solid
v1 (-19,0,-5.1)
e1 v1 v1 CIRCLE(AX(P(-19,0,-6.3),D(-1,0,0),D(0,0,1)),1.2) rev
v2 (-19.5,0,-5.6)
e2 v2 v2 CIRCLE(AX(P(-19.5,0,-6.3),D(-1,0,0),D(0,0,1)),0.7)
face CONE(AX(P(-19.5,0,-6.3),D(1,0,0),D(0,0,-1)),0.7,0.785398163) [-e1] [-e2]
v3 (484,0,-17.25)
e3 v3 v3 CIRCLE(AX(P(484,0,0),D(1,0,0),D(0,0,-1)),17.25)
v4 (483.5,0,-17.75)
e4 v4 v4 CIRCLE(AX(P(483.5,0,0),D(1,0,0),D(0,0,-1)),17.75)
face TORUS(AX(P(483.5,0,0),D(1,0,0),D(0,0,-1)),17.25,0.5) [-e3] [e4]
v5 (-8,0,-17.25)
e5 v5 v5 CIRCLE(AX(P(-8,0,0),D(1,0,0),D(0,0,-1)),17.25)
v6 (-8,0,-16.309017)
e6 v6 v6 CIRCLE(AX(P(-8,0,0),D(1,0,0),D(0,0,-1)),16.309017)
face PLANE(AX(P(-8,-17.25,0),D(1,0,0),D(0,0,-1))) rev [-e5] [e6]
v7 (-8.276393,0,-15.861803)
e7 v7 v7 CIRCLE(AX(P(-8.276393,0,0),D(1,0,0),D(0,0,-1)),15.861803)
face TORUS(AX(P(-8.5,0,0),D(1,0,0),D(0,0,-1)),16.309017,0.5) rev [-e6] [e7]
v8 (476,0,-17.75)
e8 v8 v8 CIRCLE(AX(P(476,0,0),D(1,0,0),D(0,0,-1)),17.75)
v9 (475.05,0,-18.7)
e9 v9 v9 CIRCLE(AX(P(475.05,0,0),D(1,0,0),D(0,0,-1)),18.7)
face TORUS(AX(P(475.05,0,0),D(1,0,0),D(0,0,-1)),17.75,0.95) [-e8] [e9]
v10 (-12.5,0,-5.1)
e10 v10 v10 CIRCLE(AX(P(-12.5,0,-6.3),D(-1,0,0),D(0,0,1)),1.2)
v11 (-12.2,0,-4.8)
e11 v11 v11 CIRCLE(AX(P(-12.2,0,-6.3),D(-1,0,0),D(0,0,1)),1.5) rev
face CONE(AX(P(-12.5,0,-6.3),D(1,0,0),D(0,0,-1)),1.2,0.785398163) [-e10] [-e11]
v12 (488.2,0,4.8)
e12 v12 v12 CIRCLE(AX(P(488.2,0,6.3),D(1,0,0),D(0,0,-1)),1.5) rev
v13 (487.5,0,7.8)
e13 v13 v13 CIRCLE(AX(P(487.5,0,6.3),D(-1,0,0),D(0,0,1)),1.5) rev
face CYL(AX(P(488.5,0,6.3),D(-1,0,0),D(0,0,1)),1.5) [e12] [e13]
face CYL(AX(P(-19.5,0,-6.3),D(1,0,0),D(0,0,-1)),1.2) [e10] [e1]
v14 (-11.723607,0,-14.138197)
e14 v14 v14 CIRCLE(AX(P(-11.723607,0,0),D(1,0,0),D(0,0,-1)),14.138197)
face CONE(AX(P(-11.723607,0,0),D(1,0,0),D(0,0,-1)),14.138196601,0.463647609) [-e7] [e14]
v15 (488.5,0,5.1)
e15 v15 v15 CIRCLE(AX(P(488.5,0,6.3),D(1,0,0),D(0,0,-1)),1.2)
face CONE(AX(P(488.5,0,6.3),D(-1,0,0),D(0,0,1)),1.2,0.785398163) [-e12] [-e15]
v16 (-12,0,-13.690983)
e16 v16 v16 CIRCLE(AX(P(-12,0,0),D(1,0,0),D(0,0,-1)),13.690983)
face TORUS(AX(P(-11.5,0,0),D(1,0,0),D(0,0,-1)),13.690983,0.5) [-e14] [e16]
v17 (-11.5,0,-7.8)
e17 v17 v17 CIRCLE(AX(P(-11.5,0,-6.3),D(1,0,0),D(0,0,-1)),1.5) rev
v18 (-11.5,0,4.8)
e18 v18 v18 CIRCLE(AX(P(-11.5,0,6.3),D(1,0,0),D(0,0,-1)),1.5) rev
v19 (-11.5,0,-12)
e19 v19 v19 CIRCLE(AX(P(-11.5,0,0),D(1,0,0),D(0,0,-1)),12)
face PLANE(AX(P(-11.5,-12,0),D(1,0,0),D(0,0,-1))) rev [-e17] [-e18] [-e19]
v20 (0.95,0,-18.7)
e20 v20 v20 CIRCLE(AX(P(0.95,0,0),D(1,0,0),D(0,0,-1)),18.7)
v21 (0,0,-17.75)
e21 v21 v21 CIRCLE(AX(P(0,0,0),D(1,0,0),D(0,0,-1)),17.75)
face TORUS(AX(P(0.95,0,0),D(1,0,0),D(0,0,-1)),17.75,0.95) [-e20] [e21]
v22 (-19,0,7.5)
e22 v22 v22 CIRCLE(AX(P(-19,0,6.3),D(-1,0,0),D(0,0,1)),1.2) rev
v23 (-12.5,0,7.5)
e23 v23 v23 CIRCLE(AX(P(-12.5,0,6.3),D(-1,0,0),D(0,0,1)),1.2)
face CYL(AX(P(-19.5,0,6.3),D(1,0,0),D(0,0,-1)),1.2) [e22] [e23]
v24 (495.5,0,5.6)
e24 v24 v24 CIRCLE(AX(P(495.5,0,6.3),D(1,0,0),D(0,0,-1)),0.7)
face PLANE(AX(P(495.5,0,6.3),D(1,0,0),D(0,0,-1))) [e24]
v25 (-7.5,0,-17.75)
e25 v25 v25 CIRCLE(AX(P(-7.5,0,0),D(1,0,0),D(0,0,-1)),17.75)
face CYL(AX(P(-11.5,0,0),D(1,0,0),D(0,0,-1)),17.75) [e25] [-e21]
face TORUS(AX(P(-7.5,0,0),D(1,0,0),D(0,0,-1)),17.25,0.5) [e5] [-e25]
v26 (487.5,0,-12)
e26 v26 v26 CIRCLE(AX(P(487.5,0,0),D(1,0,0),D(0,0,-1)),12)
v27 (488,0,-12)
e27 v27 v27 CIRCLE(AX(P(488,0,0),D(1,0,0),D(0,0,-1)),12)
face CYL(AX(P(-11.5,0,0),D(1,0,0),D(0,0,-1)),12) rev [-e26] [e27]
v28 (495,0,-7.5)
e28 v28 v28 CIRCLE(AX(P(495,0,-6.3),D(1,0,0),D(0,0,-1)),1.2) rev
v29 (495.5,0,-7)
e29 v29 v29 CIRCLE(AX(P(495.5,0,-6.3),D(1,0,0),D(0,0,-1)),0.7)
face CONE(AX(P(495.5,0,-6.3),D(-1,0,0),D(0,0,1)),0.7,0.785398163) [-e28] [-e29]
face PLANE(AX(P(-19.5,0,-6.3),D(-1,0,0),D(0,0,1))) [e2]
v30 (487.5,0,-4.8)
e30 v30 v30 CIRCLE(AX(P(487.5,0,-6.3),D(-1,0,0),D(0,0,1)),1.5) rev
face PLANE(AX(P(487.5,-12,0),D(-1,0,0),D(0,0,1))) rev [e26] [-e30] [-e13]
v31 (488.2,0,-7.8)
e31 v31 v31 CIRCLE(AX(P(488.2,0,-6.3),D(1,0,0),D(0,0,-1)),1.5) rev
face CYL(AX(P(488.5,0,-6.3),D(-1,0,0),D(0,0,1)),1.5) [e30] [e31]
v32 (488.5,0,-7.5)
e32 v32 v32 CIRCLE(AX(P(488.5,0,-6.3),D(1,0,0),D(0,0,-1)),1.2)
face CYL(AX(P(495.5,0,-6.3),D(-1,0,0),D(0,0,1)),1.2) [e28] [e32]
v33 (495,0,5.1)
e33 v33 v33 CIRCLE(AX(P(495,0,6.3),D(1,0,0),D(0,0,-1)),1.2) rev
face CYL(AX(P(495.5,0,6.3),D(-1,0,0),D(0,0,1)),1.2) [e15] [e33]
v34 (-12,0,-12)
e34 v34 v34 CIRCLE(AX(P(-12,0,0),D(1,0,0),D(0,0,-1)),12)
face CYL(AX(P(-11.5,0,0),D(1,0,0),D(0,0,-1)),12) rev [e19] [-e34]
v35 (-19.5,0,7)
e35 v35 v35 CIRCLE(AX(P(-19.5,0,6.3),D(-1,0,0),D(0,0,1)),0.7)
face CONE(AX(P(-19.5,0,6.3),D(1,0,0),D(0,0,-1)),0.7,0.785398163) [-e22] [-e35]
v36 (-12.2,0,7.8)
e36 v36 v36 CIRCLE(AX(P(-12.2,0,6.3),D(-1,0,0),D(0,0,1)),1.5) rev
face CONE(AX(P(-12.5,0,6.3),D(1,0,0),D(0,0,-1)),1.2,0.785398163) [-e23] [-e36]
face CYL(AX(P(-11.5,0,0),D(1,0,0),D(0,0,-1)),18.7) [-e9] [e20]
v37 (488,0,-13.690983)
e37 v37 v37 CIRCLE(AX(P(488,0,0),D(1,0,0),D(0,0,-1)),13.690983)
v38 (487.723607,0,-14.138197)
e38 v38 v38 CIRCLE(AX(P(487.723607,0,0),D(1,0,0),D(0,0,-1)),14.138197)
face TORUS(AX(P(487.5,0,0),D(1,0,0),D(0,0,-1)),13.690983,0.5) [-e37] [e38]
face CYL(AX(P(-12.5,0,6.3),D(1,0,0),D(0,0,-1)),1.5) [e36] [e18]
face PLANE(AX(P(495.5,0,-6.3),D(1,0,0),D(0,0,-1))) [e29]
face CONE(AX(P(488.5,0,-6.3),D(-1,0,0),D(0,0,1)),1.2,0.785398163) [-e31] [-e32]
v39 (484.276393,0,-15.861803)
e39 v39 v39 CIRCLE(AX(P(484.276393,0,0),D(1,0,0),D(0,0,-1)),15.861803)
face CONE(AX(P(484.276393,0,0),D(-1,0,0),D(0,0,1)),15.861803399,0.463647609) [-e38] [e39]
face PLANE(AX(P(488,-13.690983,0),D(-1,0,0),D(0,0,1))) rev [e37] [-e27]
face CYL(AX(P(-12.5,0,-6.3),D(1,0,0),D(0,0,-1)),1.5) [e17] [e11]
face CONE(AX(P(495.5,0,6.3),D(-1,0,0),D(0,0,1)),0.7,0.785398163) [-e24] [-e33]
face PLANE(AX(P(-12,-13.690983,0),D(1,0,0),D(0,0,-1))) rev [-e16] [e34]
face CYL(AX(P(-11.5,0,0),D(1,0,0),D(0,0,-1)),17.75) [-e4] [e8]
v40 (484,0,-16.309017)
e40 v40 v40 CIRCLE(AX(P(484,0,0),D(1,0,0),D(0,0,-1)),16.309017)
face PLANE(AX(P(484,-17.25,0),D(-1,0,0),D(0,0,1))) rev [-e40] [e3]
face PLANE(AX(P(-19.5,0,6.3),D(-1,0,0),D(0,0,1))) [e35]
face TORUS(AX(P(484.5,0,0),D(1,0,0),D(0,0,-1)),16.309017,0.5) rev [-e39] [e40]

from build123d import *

# Parameters (mm, degrees)
SKETCH2_R      = 1.2
EXTRUDE1_DEPTH = 8
SKETCH3_R      = 1.5
EXTRUDE2_DEPTH = 1
EXTRUDE3_START = 8
SKETCH4_R      = 1.2
EXTRUDE3_DEPTH = 8
EXTRUDE4_START = 1
SKETCH5_R      = 1.5
EXTRUDE4_DEPTH = 1
CHAMFER1_SIZE  = 0.3
CHAMFER2_SIZE  = 0.5


with BuildPart() as part:
    # Sketch1 → Revolve1 (revolve)
    with BuildSketch(Plane.XY, mode=Mode.PRIVATE) as revolve1_sk:
        with BuildLine():
            Line((0, -17.75), (-7.5, -17.75))
            ThreePointArc((-7.5, -17.75), (-7.853553391, -17.603553391), (-8, -17.25))
            Line((-8, -17.25), (-8, -16.309016994))
            ThreePointArc((-8, -16.309016994), (-8.074674596, -16.046151438), (-8.276393202, -15.861803399))
            Line((-8.276393202, -15.861803399), (-11.723606798, -14.138196601))
            ThreePointArc((-11.723606798, -14.138196601), (-11.925325404, -13.953848562), (-12, -13.690983006))
            Line((-12, -13.690983006), (-12, -12))
            Line((-12, -12), (-11.5, -12))
            Line((-11.5, -12), (-11.5, 0))
            Line((-11.5, 0), (0, 0))
            Line((0, 0), (476, 0))
            Line((476, 0), (487.5, 0))
            Line((487.5, 0), (487.5, -12))
            Line((487.5, -12), (488, -12))
            Line((488, -12), (488, -13.690983006))
            ThreePointArc((488, -13.690983006), (487.925325404, -13.953848562), (487.723606798, -14.138196601))
            Line((487.723606798, -14.138196601), (484.276393202, -15.861803399))
            ThreePointArc((484.276393202, -15.861803399), (484.074674596, -16.046151438), (484, -16.309016994))
            Line((484, -16.309016994), (484, -17.25))
            ThreePointArc((484, -17.25), (483.853553391, -17.603553391), (483.5, -17.75))
            Line((483.5, -17.75), (476, -17.75))
            ThreePointArc((476, -17.75), (475.721751442, -18.421751442), (475.05, -18.7))
            Line((475.05, -18.7), (0.95, -18.7))
            ThreePointArc((0.95, -18.7), (0.278248558, -18.421751442), (0, -17.75))
        make_face()
    revolve(revolve1_sk.sketch.rotate(Axis((-11.5, 0, 0), (-1, 0, 0)), 270), axis=Axis((-11.5, 0, 0), (-1, 0, 0)))

    # Sketch2 → Extrude1 (add)
    with BuildSketch(Plane.ZY.offset(11.5)):
        with Locations(Location((-6.3, 0, 0), (0, 0, 180))):
            Circle(SKETCH2_R)
        with Locations(Location((6.3, 0, 0), (0, 0, 180))):
            Circle(SKETCH2_R)
    extrude(amount=EXTRUDE1_DEPTH)

    # Sketch3 → Extrude2 (add)
    with BuildSketch(Plane.ZY.offset(11.5)):
        with Locations(Location((-6.3, 0, 0), (0, 0, 180))):
            Circle(SKETCH3_R)
        with Locations(Location((6.3, 0, 0), (0, 0, 180))):
            Circle(SKETCH3_R)
    extrude(amount=EXTRUDE2_DEPTH)

    # Sketch4 → Extrude3 (add)
    with BuildSketch(Plane(origin=(487.5, 0, 0), x_dir=(0, 0, -1), z_dir=(1, 0, 0)).offset(EXTRUDE3_START)):
        with Locations(Location((6.3, 0, 0), (0, 0, 180))):
            Circle(SKETCH4_R)
        with Locations(Location((-6.3, 0, 0), (0, 0, 180))):
            Circle(SKETCH4_R)
    extrude(amount=-EXTRUDE3_DEPTH)

    # Sketch5 → Extrude4 (add)
    with BuildSketch(Plane(origin=(487.5, 0, 0), x_dir=(0, 0, -1), z_dir=(1, 0, 0)).offset(EXTRUDE4_START)):
        with Locations((6.3, 0)):
            Circle(SKETCH5_R)
        with Locations((-6.3, 0)):
            Circle(SKETCH5_R)
    extrude(amount=-EXTRUDE4_DEPTH)

    # Chamfer1
    chamfer1_edges = [part.edges().sort_by_distance(p)[0] for p in [
        (-12.5, 0, -4.8),
        (-12.5, 0, 7.8),
        (488.5, 0, -4.8),
        (488.5, 0, 7.8),
    ]]
    chamfer(chamfer1_edges, length=CHAMFER1_SIZE - 0.0001)  # a hair under: the kernel refuses the full size

    # Chamfer2
    chamfer2_edges = [part.edges().sort_by_distance(p)[0] for p in [
        (-19.5, 0, -5.1),
        (-19.5, 0, 7.5),
        (495.5, 0, -7.5),
        (495.5, 0, 5.1),
    ]]
    chamfer(chamfer2_edges, length=CHAMFER2_SIZE)


solid = part.part
